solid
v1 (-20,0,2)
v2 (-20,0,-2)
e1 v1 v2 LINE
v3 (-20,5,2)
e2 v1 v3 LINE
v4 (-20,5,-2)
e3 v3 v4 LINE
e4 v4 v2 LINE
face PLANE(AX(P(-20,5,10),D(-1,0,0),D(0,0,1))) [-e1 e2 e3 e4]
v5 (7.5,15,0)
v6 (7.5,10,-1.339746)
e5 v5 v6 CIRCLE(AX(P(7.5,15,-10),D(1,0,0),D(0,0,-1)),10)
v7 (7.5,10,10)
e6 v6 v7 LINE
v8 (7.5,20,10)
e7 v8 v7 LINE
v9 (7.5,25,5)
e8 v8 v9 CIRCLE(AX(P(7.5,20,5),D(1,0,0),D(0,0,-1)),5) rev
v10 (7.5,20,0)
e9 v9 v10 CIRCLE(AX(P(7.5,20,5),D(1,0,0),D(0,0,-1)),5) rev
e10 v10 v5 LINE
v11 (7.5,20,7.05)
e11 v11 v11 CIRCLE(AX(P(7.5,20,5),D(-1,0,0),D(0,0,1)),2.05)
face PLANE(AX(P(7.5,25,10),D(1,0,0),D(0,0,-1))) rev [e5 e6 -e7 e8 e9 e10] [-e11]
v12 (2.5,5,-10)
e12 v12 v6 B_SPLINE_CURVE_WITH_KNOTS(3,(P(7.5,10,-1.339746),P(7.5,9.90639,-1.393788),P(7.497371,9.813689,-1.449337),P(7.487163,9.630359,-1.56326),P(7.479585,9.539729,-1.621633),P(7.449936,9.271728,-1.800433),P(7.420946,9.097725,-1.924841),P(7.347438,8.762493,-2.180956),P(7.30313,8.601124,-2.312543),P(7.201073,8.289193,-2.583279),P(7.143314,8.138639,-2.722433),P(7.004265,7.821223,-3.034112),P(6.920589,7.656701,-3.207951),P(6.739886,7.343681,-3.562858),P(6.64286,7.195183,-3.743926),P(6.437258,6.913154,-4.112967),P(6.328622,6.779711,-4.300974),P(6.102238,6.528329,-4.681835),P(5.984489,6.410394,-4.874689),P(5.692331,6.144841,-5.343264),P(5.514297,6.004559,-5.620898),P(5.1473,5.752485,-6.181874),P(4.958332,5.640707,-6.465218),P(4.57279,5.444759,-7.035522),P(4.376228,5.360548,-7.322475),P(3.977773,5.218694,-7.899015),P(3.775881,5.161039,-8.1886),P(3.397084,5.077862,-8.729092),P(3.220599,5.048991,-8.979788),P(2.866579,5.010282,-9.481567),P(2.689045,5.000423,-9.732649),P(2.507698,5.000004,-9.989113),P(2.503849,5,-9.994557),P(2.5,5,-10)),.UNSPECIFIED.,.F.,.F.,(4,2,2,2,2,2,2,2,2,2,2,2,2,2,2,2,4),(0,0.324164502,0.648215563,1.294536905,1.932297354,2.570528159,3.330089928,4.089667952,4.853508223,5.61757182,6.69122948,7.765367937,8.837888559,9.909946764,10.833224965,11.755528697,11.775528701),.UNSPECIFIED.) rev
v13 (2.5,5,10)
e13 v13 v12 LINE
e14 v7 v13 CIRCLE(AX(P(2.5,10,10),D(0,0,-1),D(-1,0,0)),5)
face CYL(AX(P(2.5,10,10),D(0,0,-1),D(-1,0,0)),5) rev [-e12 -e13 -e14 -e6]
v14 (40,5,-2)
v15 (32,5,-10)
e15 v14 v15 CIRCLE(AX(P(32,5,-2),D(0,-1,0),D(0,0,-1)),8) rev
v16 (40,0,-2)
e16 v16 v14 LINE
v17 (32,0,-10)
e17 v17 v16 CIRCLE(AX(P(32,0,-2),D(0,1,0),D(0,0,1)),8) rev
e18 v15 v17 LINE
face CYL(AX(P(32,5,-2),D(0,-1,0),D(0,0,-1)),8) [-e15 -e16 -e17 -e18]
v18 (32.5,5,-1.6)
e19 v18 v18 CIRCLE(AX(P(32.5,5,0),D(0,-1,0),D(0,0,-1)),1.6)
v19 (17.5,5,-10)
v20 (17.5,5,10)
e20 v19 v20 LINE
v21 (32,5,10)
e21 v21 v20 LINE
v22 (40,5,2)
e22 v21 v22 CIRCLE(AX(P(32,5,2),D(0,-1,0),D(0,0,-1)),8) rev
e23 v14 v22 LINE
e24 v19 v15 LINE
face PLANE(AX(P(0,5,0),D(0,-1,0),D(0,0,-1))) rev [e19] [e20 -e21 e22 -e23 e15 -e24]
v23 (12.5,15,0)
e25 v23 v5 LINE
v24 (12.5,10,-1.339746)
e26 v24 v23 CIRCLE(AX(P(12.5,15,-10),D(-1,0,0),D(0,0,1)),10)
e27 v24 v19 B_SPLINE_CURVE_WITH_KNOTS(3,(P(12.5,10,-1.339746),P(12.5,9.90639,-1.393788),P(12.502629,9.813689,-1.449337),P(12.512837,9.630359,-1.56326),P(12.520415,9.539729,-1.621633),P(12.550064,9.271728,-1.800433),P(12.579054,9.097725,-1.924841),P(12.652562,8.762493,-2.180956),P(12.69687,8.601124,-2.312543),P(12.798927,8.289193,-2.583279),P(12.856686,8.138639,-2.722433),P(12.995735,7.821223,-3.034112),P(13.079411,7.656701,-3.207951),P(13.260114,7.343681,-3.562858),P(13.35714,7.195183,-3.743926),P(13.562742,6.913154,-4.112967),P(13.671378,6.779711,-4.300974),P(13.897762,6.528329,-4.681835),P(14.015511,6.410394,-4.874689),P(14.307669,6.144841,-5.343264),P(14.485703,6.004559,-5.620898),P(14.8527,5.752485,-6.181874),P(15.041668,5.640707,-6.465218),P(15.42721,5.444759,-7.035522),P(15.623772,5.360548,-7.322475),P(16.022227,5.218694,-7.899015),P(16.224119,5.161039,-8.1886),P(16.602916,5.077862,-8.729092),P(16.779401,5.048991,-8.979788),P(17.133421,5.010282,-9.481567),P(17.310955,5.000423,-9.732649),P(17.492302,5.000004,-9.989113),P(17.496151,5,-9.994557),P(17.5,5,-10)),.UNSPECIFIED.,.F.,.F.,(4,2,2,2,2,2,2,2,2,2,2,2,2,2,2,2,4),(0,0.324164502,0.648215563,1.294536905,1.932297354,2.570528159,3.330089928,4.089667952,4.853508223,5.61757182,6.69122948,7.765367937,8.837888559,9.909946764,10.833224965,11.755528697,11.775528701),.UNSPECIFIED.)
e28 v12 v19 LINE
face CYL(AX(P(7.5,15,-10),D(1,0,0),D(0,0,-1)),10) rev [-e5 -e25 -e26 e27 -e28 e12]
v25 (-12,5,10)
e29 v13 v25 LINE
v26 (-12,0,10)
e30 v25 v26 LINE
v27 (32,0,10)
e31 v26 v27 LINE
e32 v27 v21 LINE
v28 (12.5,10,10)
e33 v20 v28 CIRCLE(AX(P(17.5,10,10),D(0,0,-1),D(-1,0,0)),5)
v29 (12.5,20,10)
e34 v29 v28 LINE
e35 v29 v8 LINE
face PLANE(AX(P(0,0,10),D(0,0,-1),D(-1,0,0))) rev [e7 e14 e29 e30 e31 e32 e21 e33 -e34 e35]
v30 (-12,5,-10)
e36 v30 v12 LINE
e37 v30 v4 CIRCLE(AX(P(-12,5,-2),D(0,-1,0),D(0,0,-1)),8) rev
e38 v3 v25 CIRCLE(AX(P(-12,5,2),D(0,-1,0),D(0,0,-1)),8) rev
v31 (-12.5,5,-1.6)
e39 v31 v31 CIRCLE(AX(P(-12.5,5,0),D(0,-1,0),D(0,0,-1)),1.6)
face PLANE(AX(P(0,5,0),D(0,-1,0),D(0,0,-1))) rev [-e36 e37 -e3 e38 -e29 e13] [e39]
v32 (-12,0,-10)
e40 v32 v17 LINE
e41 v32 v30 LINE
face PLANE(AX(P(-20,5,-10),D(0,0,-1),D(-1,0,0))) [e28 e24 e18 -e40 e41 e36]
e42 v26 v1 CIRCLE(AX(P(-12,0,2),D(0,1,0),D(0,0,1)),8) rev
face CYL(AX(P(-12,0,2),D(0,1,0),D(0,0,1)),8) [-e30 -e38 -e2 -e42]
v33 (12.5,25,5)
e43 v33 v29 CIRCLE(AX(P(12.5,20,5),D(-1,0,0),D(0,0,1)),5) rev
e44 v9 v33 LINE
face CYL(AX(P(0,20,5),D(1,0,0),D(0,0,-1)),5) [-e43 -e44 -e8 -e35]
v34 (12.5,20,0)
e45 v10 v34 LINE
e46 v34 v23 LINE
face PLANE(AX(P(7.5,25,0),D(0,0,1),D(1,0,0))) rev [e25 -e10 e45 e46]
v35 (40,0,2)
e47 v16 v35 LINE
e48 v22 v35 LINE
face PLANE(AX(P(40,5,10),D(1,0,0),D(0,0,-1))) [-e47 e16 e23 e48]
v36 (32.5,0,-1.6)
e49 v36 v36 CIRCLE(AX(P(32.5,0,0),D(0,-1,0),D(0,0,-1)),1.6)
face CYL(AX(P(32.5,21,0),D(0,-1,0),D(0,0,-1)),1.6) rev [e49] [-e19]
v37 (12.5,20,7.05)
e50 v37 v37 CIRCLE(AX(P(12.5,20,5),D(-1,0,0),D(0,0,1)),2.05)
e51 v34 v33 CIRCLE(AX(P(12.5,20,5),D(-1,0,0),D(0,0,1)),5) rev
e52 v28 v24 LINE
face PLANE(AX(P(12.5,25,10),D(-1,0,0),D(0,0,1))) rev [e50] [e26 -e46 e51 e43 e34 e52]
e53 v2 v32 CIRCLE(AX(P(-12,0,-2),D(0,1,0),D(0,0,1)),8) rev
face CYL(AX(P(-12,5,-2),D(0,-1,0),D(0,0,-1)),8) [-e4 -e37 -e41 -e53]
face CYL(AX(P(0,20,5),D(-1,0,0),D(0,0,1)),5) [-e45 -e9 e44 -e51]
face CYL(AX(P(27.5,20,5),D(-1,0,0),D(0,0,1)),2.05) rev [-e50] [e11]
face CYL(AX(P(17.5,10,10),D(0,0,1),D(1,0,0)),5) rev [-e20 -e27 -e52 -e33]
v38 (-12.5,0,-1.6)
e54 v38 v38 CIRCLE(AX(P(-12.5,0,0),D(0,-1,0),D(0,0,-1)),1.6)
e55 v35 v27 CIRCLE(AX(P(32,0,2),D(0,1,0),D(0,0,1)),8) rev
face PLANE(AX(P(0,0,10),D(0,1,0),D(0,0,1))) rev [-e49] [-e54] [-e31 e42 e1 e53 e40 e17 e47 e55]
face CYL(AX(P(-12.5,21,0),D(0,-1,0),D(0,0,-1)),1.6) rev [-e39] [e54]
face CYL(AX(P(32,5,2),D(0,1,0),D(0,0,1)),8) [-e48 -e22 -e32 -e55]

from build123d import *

# Parameters (mm, degrees)
SKETCH_1_W          = 20
SKETCH_1_H          = 15
EXTRUDE_1_DEPTH     = 10
SKETCH_2_W          = 60
SKETCH_2_H          = 20
EXTRUDE_2_DEPTH     = 5
SKETCH_3_R          = 1.6
CUT_EXTRUDE_1_DEPTH = 21
FILLET_1_R          = 8
SKETCH_6_W          = 20
SKETCH_6_H          = 10
CUT_EXTRUDE_3_DEPTH = 10
SKETCH_7_W          = 5
SKETCH_7_H          = 10
EXTRUDE_4_DEPTH     = 20
SKETCH_8_R          = 2.05
CUT_EXTRUDE_4_DEPTH = 20
FILLET_2_R          = 5
FILLET_3_R          = 10
FILLET_4_R          = 5


with BuildPart() as part:
    # 草图1 → 凸台-拉伸1 (new body)
    with BuildSketch(Plane.XY):
        with Locations((10, 7.5)):
            Rectangle(SKETCH_1_W, SKETCH_1_H)
    extrude(amount=EXTRUDE_1_DEPTH)

    # 草图2 → 凸台-拉伸2 (add)
    with BuildSketch(Plane.XZ):
        with Locations((10, 0)):
            Rectangle(SKETCH_2_W, SKETCH_2_H)
    extrude(amount=-EXTRUDE_2_DEPTH)

    # 草图3 → 切除-拉伸1 (cut)
    with BuildSketch(Plane.XZ):
        with Locations(Location((-12.5, 0, 0), (0, 0, 270))):
            Circle(SKETCH_3_R)
        with Locations(Location((32.5, 0, 0), (0, 0, 270))):
            Circle(SKETCH_3_R)
    extrude(amount=-CUT_EXTRUDE_1_DEPTH, mode=Mode.SUBTRACT)

    # 圆角1
    fillet_1_edges = [part.edges().sort_by_distance(p)[0] for p in [
        (-20, 2.5, 10),
        (-20, 2.5, -10),
        (40, 2.5, 10),
        (40, 2.5, -10),
    ]]
    fillet(fillet_1_edges, radius=FILLET_1_R)

    # 草图6 → 切除-拉伸3 (cut)
    with BuildSketch(Plane(origin=(0, 15, 0), x_dir=(1, 0, 0), z_dir=(0, 1, 0))):
        with Locations((10, -5)):
            Rectangle(SKETCH_6_W, SKETCH_6_H)
    extrude(amount=-CUT_EXTRUDE_3_DEPTH, mode=Mode.SUBTRACT)

    # 草图7 → 凸台-拉伸4 (add)
    with BuildSketch(Plane(origin=(0, 5, 0), x_dir=(1, 0, 0), z_dir=(0, 1, 0))):
        with Locations((10, -5)):
            Rectangle(SKETCH_7_W, SKETCH_7_H)
    extrude(amount=EXTRUDE_4_DEPTH)

    # 草图8 → 切除-拉伸4 (cut)
    with BuildSketch(Plane.ZY.offset(-7.5)):
        with Locations((5, 20)):
            Circle(SKETCH_8_R)
    extrude(amount=-CUT_EXTRUDE_4_DEPTH, mode=Mode.SUBTRACT)

    # 圆角2
    fillet_2_edges = [part.edges().sort_by_distance(p)[0] for p in [
        (10, 25, 0),
        (10, 25, 10),
    ]]
    fillet(fillet_2_edges, radius=FILLET_2_R - 0.0001)  # a hair under: the kernel refuses the full size

    # 圆角3
    fillet_3_edges = [part.edges().sort_by_distance(p)[0] for p in [
        (10, 5, 0),
    ]]
    fillet(fillet_3_edges, radius=FILLET_3_R - 0.0001)  # a hair under: the kernel refuses the full size

    # 圆角4
    fillet_4_edges = [part.edges().sort_by_distance(p)[0] for p in [
        (7.5, 5, 5e-05),
        (12.5, 5, 5e-05),
    ]]
    fillet(fillet_4_edges, radius=FILLET_4_R)


solid = part.part
